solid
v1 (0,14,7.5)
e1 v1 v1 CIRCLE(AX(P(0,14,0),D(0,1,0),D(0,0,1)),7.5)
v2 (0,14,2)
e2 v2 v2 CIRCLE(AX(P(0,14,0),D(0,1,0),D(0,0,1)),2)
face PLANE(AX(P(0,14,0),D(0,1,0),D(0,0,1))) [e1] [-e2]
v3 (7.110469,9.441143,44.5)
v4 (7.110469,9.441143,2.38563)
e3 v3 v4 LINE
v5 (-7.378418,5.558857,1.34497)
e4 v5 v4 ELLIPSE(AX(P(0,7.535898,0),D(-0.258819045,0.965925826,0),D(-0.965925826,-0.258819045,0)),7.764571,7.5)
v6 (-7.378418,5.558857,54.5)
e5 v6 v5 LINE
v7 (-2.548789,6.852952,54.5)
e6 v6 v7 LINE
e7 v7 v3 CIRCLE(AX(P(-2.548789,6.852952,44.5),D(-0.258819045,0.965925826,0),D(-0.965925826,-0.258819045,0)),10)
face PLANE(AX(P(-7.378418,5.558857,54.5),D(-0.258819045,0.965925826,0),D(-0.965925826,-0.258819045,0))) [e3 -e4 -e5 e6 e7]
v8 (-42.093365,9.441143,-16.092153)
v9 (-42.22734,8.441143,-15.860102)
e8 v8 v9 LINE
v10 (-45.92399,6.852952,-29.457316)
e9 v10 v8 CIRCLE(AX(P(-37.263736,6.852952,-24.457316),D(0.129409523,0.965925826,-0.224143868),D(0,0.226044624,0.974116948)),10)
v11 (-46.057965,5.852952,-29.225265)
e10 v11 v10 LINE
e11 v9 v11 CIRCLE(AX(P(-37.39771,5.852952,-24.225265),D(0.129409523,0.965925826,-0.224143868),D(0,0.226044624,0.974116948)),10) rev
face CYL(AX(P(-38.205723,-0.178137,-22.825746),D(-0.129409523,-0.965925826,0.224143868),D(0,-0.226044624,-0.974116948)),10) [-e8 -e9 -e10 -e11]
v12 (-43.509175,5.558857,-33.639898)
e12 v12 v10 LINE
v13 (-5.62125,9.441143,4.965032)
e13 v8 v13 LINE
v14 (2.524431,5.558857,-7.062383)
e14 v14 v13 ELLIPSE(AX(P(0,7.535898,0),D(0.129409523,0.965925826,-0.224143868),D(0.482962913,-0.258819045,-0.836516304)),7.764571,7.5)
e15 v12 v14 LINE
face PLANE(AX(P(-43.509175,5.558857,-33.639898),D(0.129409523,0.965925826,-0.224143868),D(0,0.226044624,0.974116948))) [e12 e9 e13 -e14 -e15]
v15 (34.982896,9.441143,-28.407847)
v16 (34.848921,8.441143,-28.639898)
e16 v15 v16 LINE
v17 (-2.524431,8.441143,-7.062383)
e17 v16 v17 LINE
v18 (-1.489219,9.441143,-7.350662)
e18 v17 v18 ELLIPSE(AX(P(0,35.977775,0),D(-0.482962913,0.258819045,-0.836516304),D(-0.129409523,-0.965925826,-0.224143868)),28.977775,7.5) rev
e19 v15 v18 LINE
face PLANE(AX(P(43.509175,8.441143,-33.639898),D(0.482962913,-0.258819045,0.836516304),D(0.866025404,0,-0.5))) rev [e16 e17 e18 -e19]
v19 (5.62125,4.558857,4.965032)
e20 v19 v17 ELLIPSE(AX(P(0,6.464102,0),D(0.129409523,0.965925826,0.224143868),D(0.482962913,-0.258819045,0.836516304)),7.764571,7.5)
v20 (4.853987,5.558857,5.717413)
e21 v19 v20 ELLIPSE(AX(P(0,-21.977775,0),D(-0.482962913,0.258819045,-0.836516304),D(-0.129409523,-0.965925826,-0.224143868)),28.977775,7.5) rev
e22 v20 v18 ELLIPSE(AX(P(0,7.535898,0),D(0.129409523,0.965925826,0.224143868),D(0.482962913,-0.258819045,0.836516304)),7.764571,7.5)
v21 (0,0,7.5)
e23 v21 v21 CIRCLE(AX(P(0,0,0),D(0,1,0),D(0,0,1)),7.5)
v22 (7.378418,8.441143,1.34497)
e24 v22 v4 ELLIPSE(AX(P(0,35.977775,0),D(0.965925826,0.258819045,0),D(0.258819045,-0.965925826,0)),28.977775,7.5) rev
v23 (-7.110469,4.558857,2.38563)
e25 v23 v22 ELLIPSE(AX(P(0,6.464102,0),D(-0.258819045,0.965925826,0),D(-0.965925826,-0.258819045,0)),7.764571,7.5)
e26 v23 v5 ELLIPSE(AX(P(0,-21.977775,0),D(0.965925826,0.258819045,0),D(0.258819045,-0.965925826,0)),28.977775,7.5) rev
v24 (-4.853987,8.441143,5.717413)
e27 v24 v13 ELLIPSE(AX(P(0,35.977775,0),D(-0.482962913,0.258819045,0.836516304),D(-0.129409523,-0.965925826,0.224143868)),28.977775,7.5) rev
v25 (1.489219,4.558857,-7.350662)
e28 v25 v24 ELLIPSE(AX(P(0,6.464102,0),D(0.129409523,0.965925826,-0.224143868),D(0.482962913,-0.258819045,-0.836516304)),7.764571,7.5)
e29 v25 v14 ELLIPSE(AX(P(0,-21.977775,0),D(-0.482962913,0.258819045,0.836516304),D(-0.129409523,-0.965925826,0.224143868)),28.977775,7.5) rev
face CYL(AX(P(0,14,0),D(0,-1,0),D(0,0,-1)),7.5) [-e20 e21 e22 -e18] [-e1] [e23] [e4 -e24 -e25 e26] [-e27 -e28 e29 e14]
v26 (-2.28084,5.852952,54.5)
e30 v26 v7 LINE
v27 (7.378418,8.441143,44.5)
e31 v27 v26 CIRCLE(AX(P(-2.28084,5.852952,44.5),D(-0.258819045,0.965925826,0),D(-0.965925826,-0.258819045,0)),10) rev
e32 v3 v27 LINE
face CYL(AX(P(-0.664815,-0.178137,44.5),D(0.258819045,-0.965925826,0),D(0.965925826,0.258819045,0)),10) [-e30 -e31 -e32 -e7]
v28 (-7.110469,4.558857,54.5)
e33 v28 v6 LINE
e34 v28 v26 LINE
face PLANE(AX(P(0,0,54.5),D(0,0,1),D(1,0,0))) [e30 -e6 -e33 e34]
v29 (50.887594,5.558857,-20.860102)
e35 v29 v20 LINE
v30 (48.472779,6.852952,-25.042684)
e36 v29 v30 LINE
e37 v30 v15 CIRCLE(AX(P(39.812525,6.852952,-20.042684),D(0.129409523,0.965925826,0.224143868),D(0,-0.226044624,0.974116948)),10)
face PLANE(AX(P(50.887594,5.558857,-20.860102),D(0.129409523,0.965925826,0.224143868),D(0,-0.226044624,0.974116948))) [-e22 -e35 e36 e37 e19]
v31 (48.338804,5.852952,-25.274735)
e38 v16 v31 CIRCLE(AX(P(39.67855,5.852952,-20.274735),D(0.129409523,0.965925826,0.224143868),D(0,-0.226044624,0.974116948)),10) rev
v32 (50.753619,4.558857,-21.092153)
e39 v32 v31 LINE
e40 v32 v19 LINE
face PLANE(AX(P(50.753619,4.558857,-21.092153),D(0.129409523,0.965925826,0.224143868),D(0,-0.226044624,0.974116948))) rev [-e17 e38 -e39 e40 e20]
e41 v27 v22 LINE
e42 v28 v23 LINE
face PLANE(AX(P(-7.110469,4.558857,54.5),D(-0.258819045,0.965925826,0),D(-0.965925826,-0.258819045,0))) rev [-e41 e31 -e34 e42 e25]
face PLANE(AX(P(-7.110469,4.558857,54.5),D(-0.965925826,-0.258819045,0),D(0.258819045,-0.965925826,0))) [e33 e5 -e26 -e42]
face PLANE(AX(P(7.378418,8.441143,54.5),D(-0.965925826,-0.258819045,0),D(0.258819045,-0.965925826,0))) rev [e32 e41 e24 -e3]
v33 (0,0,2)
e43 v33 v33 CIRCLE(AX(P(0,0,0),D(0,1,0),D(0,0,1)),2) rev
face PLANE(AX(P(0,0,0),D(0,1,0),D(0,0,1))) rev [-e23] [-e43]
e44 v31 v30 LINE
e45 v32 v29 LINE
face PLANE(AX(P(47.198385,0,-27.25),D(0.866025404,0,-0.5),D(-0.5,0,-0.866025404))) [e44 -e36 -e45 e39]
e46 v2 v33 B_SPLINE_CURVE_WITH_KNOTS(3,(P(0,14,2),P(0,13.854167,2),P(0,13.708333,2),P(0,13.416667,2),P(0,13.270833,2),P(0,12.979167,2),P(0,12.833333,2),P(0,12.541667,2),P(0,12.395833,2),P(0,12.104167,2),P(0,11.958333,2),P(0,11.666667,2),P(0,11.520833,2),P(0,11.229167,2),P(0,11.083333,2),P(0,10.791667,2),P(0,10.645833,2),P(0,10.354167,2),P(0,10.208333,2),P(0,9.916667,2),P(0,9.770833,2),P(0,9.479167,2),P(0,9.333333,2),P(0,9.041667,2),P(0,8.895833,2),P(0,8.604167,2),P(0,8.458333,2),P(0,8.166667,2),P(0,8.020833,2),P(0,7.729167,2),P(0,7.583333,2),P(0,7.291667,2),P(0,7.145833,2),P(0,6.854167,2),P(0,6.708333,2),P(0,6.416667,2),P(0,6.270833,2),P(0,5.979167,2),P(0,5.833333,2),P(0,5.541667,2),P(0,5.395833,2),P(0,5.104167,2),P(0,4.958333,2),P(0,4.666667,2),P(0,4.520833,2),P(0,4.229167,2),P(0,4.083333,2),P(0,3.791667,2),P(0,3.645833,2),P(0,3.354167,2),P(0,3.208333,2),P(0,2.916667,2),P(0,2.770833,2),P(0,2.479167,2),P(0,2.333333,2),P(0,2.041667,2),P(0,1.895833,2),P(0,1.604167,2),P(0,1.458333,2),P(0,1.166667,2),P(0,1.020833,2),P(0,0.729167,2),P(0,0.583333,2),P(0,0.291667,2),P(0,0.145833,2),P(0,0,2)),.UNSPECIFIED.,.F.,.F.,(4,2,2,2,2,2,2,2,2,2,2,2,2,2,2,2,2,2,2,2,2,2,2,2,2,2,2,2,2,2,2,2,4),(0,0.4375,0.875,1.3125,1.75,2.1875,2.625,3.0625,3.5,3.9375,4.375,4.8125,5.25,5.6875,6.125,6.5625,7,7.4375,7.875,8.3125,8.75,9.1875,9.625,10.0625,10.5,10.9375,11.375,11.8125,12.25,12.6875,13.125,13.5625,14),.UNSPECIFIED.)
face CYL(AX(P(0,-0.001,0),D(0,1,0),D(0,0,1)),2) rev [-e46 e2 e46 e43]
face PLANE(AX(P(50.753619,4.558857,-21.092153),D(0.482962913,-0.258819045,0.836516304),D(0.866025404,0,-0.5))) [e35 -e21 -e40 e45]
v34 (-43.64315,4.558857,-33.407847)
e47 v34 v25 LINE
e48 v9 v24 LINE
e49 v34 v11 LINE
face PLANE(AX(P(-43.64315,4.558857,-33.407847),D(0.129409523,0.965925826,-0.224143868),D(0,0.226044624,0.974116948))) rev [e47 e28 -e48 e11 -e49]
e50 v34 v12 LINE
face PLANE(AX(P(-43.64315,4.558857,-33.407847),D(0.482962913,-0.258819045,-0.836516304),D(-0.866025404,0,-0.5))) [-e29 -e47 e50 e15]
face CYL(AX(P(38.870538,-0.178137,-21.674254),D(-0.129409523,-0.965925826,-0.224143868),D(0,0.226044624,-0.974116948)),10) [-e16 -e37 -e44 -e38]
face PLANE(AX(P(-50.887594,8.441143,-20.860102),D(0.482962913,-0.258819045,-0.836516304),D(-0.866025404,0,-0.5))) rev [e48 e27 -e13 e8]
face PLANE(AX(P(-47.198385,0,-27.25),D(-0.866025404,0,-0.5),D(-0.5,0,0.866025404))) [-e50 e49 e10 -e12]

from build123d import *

# Parameters (mm, degrees)
SKETCH1_R                = 7.5
BOSS_EXTRUDE2_DEPTH      = 14
CUT_EXTRUDE1_REACH       = 19.564
SKETCH2_R                = 2
BOSS_EXTRUDE3_START      = -7.279118874
BOSS_EXTRUDE3_DEPTH      = 1.03527618
FILLET1_R                = 10
CIRPATTERN1_COUNT        = 3
FILLET1_OF_CIRPATTERN1_R = 10


with BuildPart() as part:
    # Sketch1 → Boss-Extrude2 (new body)
    with BuildSketch(Plane(origin=(0, 0, 0), x_dir=(1, 0, 0), z_dir=(0, 1, 0))):
        with Locations(Location((0, 0, 0), (0, 0, 270))):
            Circle(SKETCH1_R)
    extrude(amount=BOSS_EXTRUDE2_DEPTH)

    # Sketch2 → Cut-Extrude1 (cut, up to next)
    with BuildSketch(Plane(origin=(0, 14, 0), x_dir=(1, 0, 0), z_dir=(0, 1, 0)), mode=Mode.PRIVATE) as cut_extrude1_sk1:
        with Locations(Location((0, 0, 0), (0, 0, 270))):
            Circle(SKETCH2_R)
    cut_extrude1_tool1 = extrude(cut_extrude1_sk1.sketch, amount=-CUT_EXTRUDE1_REACH, mode=Mode.PRIVATE) & part.part
    add(cut_extrude1_tool1.solids().sort_by_distance((0, 14, 0))[0], mode=Mode.SUBTRACT)

    # Boss-Extrude3: read off the stored shape, not the designer's step
    # Boss-Extrude3 outline → Boss-Extrude3 (add)
    with BuildSketch(Plane(origin=(0, 0, 0), x_dir=(0.9659258262890672, 0.2588190451025251, 0), z_dir=(0.25881904510252507, -0.9659258262890672, 0)).offset(BOSS_EXTRUDE3_START)):
        with BuildLine():
            add(Edge.make_bspline(
                [(-5.688266684, 1.344969698), (-4.547659305, 7.389056985), (1.811733316, 7.498803292)],
                knots=[0.18030465, 0.18030465, 0.18030465, 1.551469461, 1.551469461, 1.551469461], degree=2, weights=[1, 0.771122328, 0.993637519]))
            add(Edge.make_bspline(
                [(1.811733316, 7.498803292), (8.171125936, 7.389056985), (9.311733316, 1.344969698)],
                knots=[1.590123193, 1.590123193, 1.590123193, 2.961288004, 2.961288004, 2.961288004], degree=2, weights=[0.993637519, 0.771122328, 1]))
            Line((9.311733316, 1.344969698), (9.311733316, 54.5))
            Line((9.311733316, 54.5), (-5.688266684, 54.5))
            Line((-5.688266684, 54.5), (-5.688266684, 1.344969698))
        make_face()
    boss_extrude3 = extrude(amount=BOSS_EXTRUDE3_DEPTH)

    # Fillet1
    fillet1_edges = [part.edges().sort_by_distance(p)[0] for p in [
        (7.244443697, 8.941142838, 54.5),
    ]]
    fillet(fillet1_edges, radius=FILLET1_R)

    # CirPattern1: Boss-Extrude3 ×3 about axis
    cirpattern1_axis = Axis((0, 0, 0), (0, 1, 0))
    for i in range(1, CIRPATTERN1_COUNT):
        add(boss_extrude3.rotate(cirpattern1_axis, i * 360 / CIRPATTERN1_COUNT))

    # Fillet1 of CirPattern1
    fillet1_of_cirpattern1_edges = [part.edges().sort_by_distance(p)[0] for p in [
        (43.576162658, 8.941142838, -33.523872278),
        (-50.820606355, 8.941142838, -20.976127722),
    ]]
    fillet(fillet1_of_cirpattern1_edges, radius=FILLET1_OF_CIRPATTERN1_R)


solid = part.part
